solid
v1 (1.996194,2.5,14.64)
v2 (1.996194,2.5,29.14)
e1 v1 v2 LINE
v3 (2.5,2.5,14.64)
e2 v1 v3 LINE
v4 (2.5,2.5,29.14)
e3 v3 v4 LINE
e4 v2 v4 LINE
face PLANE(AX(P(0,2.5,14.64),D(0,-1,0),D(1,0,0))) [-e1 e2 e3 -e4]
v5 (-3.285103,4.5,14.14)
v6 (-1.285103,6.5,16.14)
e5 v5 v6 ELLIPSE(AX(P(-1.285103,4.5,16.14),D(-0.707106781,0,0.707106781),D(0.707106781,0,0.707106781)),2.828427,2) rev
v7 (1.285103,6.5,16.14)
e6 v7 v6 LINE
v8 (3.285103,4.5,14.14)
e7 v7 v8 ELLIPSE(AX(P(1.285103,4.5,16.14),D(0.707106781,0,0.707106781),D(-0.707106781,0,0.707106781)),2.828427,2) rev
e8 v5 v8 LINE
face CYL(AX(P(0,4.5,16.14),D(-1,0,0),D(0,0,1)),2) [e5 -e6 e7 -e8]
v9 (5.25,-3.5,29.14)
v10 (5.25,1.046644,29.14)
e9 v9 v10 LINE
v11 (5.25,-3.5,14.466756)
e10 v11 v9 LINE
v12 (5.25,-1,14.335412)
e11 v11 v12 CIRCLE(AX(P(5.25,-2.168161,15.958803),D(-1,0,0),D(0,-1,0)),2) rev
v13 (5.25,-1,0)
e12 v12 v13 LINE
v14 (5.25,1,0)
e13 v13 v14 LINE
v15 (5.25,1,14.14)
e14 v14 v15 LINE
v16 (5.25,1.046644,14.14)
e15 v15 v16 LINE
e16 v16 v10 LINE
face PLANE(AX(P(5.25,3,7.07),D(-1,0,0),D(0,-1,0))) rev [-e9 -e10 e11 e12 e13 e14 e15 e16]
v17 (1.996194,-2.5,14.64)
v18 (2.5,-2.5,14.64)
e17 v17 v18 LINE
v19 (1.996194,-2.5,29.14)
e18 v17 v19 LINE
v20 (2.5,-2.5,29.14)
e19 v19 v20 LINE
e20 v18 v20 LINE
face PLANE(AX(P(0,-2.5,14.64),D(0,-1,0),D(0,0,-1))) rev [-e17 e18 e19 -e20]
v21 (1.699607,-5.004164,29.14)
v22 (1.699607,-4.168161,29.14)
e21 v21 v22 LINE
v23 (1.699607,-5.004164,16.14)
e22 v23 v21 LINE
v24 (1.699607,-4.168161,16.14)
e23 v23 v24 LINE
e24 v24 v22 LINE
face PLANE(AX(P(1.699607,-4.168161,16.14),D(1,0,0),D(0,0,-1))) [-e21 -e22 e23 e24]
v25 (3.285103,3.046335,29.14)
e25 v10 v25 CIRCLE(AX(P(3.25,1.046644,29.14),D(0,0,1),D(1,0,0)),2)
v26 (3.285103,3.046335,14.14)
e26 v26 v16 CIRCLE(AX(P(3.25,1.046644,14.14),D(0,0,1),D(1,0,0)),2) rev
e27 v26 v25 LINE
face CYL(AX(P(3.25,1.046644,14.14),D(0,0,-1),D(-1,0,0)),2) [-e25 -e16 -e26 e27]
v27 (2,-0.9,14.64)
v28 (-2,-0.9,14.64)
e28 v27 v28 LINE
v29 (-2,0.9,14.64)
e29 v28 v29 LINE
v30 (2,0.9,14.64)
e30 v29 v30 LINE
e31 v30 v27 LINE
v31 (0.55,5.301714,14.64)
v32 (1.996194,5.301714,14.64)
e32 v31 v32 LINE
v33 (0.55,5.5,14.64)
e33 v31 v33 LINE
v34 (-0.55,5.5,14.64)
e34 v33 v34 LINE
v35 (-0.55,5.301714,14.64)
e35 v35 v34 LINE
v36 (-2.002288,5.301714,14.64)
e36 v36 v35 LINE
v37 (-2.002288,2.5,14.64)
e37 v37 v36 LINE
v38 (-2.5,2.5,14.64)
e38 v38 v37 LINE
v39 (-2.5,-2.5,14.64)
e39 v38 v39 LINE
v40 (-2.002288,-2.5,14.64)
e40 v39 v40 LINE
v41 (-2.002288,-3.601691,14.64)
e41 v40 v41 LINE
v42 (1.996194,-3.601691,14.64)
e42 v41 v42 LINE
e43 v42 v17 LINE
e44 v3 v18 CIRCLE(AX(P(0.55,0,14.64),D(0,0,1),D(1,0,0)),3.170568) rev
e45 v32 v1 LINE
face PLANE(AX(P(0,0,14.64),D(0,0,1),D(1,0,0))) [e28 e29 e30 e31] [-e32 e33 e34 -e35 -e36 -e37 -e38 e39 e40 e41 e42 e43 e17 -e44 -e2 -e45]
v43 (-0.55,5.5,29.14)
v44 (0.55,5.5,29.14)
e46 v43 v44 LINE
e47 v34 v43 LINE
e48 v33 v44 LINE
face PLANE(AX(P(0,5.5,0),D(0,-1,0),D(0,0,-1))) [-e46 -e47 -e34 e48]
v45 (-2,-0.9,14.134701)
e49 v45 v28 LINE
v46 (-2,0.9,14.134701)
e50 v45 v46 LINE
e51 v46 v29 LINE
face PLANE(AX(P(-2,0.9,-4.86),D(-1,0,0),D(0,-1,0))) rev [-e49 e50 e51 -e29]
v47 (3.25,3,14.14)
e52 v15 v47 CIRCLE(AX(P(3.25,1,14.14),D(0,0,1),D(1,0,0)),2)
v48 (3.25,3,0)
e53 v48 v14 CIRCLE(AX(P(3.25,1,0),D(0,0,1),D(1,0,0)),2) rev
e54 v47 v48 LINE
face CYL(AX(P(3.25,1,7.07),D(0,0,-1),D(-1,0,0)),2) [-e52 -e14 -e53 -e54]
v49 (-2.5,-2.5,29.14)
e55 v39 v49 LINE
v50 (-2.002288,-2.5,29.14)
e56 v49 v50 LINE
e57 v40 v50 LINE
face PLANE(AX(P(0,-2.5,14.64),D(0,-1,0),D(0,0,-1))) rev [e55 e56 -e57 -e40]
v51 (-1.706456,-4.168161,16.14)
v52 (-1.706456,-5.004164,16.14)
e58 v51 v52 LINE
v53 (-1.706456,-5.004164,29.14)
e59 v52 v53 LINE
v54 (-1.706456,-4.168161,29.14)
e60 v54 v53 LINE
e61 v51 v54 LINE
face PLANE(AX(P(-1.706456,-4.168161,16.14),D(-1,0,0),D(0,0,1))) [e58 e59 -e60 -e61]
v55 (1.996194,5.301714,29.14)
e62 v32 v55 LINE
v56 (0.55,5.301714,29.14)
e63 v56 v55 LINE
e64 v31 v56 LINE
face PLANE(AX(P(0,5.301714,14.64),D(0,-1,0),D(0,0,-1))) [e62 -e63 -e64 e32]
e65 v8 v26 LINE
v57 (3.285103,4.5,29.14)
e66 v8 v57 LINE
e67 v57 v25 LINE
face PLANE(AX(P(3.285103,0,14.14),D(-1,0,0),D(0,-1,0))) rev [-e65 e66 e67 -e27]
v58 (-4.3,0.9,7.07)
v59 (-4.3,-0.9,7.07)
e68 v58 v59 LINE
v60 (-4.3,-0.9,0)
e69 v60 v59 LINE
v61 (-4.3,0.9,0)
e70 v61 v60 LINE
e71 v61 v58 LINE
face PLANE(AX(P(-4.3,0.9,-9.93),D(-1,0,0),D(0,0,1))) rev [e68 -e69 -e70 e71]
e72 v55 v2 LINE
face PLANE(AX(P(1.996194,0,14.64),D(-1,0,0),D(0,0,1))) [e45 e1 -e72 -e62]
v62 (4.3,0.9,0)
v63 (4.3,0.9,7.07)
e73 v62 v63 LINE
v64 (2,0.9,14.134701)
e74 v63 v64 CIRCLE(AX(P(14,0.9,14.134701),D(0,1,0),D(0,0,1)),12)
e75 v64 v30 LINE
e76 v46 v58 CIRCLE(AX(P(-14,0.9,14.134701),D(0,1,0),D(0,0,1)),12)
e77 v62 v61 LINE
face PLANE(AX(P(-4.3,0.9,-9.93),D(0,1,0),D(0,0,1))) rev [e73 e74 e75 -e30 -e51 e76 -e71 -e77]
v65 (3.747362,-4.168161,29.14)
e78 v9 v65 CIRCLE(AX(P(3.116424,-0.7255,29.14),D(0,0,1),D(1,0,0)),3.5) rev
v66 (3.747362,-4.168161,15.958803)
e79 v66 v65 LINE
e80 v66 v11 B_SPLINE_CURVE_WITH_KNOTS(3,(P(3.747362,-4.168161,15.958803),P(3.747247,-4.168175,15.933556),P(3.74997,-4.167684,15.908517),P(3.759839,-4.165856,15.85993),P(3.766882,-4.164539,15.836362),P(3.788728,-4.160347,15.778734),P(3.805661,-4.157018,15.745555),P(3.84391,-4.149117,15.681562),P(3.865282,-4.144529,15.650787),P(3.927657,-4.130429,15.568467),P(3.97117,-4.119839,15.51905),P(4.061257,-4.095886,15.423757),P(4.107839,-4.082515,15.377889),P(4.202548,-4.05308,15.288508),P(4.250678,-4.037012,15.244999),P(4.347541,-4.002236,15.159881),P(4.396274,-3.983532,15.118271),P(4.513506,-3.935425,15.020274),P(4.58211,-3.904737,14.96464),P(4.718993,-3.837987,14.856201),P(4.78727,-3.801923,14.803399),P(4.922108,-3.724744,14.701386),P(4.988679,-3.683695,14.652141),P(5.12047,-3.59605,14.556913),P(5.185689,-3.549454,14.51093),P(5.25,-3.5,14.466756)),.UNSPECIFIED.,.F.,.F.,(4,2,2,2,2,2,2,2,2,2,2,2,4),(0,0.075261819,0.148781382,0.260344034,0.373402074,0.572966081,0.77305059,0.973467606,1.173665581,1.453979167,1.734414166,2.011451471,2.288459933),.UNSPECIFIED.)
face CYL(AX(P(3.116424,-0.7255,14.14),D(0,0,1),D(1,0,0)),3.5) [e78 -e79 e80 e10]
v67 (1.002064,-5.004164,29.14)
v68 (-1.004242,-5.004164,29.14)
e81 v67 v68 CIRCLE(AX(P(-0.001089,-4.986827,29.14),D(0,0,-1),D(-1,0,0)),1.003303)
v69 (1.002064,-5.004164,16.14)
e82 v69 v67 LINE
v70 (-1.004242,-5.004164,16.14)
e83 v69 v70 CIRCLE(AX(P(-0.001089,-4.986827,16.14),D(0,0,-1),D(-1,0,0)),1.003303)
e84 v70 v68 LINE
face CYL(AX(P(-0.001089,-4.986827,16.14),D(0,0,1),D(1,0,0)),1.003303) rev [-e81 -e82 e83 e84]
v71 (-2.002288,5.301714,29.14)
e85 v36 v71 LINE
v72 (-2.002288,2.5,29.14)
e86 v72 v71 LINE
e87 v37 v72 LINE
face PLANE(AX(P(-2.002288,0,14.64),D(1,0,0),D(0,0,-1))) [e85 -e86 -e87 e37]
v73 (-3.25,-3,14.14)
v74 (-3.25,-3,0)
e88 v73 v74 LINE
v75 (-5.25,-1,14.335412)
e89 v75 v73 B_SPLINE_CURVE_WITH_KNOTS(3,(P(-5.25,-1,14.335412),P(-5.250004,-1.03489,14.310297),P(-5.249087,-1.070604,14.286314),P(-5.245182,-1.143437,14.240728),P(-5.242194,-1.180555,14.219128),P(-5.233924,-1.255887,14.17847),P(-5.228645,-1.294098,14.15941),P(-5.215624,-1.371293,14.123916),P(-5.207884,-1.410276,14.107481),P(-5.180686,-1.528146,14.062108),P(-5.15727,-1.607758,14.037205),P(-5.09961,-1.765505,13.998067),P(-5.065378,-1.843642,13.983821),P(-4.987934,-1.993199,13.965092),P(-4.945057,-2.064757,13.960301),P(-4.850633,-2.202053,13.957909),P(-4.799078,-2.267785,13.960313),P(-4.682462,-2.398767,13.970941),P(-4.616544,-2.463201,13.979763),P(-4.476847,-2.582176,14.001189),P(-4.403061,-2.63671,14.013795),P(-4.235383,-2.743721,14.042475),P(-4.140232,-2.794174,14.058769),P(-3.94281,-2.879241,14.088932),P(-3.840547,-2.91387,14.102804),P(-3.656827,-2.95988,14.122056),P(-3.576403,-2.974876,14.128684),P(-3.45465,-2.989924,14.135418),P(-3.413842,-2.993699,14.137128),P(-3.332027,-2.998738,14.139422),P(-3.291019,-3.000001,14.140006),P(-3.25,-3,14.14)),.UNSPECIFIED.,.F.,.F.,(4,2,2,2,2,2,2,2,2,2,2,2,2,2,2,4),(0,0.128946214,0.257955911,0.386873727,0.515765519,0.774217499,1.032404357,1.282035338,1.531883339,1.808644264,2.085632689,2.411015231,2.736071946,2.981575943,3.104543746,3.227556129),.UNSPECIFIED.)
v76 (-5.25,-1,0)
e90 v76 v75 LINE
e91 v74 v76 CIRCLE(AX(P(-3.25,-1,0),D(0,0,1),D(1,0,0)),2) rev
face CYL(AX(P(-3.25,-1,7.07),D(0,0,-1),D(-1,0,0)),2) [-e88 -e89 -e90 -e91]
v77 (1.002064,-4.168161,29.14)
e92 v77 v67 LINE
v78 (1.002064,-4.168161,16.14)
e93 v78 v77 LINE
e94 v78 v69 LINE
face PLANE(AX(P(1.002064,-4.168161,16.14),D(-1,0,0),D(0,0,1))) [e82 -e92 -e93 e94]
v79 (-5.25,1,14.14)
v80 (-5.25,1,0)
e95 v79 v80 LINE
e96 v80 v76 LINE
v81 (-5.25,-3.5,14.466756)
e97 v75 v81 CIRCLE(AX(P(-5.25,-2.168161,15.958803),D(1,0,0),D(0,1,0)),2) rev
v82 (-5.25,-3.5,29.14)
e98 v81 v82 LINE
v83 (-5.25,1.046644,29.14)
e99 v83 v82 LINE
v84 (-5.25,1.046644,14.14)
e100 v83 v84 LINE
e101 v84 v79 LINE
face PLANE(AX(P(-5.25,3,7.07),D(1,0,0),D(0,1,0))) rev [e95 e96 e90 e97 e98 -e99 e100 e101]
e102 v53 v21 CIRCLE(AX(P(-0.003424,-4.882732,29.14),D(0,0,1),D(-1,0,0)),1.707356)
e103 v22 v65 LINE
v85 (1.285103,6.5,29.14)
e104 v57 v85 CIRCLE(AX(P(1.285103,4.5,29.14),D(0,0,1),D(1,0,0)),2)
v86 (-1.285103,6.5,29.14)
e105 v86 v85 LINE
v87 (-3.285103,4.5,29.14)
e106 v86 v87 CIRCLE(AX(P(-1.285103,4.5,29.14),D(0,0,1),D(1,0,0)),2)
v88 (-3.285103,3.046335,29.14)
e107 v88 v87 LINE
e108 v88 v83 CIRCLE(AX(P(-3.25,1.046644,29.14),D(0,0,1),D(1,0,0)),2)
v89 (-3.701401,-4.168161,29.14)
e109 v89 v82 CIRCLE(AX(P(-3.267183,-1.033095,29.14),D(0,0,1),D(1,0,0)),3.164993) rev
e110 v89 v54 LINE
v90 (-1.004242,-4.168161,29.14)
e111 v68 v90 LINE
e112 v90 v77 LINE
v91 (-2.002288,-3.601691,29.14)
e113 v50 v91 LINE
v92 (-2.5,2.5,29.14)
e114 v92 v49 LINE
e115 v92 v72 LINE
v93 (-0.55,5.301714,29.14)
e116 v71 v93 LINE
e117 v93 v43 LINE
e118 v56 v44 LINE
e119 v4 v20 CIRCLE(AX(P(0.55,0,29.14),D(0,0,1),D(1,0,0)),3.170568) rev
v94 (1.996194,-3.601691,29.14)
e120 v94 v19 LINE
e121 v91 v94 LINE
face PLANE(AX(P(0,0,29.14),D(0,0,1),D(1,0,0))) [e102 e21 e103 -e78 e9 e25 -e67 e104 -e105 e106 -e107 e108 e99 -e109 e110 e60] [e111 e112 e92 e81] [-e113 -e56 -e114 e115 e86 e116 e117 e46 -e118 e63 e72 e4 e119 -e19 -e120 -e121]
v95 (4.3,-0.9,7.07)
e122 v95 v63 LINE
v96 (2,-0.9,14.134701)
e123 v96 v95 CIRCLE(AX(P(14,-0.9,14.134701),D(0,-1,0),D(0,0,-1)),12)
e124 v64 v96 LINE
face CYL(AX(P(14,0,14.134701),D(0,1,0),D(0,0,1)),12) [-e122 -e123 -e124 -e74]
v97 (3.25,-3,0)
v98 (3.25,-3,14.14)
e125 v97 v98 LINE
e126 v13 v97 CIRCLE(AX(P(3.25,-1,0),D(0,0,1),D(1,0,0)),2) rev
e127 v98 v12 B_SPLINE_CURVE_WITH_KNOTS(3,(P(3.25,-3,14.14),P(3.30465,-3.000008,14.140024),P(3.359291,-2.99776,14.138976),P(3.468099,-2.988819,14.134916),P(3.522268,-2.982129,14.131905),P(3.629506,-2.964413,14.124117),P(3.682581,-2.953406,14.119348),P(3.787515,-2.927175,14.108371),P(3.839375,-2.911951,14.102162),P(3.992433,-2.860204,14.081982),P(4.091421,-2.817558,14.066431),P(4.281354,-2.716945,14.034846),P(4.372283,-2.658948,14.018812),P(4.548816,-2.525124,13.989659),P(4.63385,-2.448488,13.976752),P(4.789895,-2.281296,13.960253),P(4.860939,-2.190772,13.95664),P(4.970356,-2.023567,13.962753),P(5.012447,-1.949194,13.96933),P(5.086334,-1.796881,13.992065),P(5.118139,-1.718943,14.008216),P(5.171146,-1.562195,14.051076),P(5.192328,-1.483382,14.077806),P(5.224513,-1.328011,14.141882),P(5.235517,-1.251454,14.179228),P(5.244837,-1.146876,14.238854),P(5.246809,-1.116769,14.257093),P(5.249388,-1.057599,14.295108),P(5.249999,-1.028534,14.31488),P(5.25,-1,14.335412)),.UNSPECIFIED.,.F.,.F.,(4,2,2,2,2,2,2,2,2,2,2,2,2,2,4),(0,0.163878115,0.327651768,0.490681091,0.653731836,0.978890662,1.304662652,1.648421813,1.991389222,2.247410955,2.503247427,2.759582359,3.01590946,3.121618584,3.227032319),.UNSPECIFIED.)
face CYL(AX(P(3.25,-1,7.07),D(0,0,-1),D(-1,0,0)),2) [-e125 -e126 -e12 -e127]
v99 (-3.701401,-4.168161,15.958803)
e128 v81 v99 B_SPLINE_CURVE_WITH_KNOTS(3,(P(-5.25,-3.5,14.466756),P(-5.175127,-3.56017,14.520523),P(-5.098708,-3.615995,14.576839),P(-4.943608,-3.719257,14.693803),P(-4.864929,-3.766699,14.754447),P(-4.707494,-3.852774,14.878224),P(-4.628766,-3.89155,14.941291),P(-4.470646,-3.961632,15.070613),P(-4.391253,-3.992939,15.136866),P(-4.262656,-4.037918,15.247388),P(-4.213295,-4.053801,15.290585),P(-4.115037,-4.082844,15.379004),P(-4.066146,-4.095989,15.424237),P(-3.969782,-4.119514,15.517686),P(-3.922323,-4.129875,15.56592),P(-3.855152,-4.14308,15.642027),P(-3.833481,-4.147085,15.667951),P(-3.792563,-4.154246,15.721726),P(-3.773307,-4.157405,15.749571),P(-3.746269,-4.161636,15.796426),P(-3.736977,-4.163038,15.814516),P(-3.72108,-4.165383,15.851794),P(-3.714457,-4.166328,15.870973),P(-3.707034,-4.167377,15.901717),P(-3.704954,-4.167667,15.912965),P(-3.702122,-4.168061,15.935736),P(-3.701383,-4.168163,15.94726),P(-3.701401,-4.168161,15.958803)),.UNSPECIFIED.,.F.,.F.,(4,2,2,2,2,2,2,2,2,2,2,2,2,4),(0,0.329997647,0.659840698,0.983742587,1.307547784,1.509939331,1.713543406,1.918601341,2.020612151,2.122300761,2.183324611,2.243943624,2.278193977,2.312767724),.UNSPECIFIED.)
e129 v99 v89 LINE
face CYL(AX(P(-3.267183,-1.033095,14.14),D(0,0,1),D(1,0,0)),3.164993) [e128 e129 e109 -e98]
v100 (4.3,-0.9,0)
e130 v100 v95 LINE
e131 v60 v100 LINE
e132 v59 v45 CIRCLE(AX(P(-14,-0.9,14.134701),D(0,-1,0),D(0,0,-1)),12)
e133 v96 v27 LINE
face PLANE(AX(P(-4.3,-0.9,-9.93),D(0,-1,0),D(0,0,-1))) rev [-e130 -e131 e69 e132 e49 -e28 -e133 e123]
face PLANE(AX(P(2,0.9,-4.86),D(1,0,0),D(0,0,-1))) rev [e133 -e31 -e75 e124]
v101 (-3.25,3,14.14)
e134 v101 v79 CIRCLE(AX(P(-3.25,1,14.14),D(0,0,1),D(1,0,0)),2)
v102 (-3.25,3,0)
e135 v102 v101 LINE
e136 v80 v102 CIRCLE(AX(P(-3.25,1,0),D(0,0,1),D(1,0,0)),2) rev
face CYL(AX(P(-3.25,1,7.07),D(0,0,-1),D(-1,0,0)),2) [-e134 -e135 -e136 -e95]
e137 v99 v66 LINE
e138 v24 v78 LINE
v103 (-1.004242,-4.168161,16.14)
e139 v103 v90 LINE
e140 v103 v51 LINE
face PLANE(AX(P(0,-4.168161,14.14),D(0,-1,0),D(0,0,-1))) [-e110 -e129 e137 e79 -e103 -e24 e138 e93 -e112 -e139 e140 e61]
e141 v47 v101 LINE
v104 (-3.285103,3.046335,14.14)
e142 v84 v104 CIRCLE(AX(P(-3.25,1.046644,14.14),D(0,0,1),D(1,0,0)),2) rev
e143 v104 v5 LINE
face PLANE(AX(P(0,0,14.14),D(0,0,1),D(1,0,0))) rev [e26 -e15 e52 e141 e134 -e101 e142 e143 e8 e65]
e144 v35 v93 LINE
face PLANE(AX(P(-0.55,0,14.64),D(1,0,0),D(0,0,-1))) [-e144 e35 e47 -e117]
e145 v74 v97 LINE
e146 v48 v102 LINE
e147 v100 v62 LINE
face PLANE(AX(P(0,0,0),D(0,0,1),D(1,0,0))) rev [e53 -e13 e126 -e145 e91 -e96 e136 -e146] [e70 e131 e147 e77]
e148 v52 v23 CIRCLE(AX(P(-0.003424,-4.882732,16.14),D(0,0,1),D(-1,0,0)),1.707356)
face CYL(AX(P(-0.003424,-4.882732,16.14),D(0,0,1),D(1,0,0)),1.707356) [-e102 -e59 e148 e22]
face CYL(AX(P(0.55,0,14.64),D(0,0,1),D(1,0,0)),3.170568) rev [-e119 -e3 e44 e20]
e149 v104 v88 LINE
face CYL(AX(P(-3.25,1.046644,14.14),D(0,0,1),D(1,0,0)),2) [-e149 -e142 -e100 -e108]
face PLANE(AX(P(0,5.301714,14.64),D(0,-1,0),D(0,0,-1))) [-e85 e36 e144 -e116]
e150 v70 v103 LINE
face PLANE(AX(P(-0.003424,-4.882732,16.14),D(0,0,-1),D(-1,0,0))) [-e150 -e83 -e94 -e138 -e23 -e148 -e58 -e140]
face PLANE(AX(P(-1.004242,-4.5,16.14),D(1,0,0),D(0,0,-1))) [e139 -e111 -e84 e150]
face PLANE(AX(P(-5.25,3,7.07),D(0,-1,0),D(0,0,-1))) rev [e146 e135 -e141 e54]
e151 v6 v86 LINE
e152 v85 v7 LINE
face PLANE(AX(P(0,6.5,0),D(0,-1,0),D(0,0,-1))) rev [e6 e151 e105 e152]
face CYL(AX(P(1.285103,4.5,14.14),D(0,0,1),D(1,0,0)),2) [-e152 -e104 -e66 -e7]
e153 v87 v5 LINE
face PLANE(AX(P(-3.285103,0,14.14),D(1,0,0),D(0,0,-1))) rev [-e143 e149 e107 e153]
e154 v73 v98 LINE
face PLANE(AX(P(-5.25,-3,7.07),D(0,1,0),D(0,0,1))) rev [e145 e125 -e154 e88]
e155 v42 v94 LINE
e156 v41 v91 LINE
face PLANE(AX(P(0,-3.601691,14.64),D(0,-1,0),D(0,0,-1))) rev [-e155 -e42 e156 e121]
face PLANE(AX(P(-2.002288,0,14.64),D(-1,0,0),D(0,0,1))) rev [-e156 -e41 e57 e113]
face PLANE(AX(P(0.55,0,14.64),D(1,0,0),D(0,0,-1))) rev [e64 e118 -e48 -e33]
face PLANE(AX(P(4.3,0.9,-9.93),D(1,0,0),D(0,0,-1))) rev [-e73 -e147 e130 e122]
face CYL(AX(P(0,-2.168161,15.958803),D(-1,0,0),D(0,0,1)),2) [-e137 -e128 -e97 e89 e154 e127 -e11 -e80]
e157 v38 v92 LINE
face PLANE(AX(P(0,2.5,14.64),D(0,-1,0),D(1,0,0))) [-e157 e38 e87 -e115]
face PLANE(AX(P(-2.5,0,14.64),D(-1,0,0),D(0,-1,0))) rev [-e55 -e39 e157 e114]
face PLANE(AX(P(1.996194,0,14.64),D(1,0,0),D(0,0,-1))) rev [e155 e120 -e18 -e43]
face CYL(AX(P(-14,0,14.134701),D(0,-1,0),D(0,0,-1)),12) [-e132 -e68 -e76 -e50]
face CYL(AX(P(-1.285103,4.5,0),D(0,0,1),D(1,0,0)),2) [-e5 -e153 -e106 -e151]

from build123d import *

# Parameters (mm, degrees)
SKETCH1_W            = 10.5
SKETCH1_H            = 6
BOSS_EXTRUDE1_DEPTH  = 7.07
SKETCH3_W            = 8.6
SKETCH3_H            = 1.8
CUT_EXTRUDE2_DEPTH   = 17
SKETCH4_W            = 10.5
SKETCH4_H            = 6
BOSS_EXTRUDE2_DEPTH  = 7.07
SKETCH5_W            = 4
SKETCH5_H            = 1.8
CUT_EXTRUDE3_DEPTH   = 19
FILLET1_R            = 12
FILLET2_R            = 12
SKETCH19_W           = 10.5
SKETCH19_H           = 11
SKETCH19_W_2         = 4
SKETCH19_H_2         = 1.8
BOSS_EXTRUDE8_DEPTH  = 15
CUT_EXTRUDE8_DEPTH   = 14.5
SKETCH21_W           = 10.5
SKETCH21_H           = 15
BOSS_EXTRUDE9_DEPTH  = 1
CUT_EXTRUDE10_DEPTH  = 15
FILLET6_R            = 2
FILLET12_R           = 2
BOSS_EXTRUDE15_DEPTH = 13
FILLET15_R           = 2
FILLET16_R           = 2
FILLET17_R           = 2


with BuildPart() as part:
    # Sketch1 → Boss-Extrude1 (new body)
    with BuildSketch(Plane.XY):
        Rectangle(SKETCH1_W, SKETCH1_H)
    extrude(amount=BOSS_EXTRUDE1_DEPTH)

    # Sketch3 → Cut-Extrude2 (cut)
    with BuildSketch(Plane.XY.offset(7.07)):
        Rectangle(SKETCH3_W, SKETCH3_H)
    extrude(amount=-CUT_EXTRUDE2_DEPTH, mode=Mode.SUBTRACT)

    # Sketch4 → Boss-Extrude2 (add)
    with BuildSketch(Plane.XY.offset(7.07)):
        Rectangle(SKETCH4_W, SKETCH4_H)
    extrude(amount=BOSS_EXTRUDE2_DEPTH)

    # Sketch5 → Cut-Extrude3 (cut, symmetric)
    with BuildSketch(Plane.XY.offset(14.14)):
        Rectangle(SKETCH5_W, SKETCH5_H)
    extrude(amount=CUT_EXTRUDE3_DEPTH, both=True, mode=Mode.SUBTRACT)

    # Fillet1
    # the kernel refuses this fillet: 12 mm, written as the material it takes off along each edge
    with BuildSketch(Plane(origin=(2, -0.9, 7.07), x_dir=(1, 0, 0), z_dir=(0, 1, 0))) as fillet1_piece_1:
        with BuildLine():
            CenterArc((12, -7.064700984), FILLET1_R, 143.93341174, 36.06658826)
            Line((0, -7.064700984), (0, 0))
            Line((0, 0), (2.3, 0))
        make_face()
    extrude(amount=1.8, mode=Mode.SUBTRACT)

    # Fillet2
    # the kernel refuses this fillet: 12 mm, written as the material it takes off along each edge
    with BuildSketch(Plane(origin=(-2, 0.9, 7.07), x_dir=(0, 0, 1), z_dir=(0, -1, 0))) as fillet2_piece_1:
        with BuildLine():
            CenterArc((7.064700984, 12), FILLET2_R, 233.93341174, 36.06658826)
            Line((0, 2.3), (0, 0))
            Line((0, 0), (7.064700984, 0))
        make_face()
    extrude(amount=1.8, mode=Mode.SUBTRACT)

    # Sketch19 → Boss-Extrude8 (add)
    with BuildSketch(Plane.XY.offset(14.14)):
        Rectangle(SKETCH19_W, SKETCH19_H)
        Rectangle(SKETCH19_W_2, SKETCH19_H_2, mode=Mode.SUBTRACT)
    extrude(amount=BOSS_EXTRUDE8_DEPTH)

    # Sketch20 → Cut-Extrude8 (cut)
    with BuildSketch(Plane.XY.offset(29.14)):
        with BuildLine():
            Line((1.996194266, 2.5), (1.996194266, 3.60169129))
            Line((1.996194266, 3.60169129), (1.996194266, 5.301713665))
            Line((1.996194266, 5.301713665), (0.55, 5.301713665))
            Line((0.55, 5.301713665), (0.55, 5.5))
            Line((0.55, 5.5), (-0.55, 5.5))
            Line((-0.55, 5.5), (-0.55, 5.301713665))
            Line((-0.55, 5.301713665), (-2.002287503, 5.301713665))
            Line((-2.002287503, 5.301713665), (-2.002287503, 2.5))
            Line((-2.002287503, 2.5), (-2.5, 2.5))
            Line((-2.5, 2.5), (-2.5, -2.5))
            Line((-2.5, -2.5), (-2.002287503, -2.5))
            Line((-2.002287503, -2.5), (-2.002287503, -3.60169129))
            Line((-2.002287503, -3.60169129), (0, -3.60169129))
            Line((0, -3.60169129), (1.996194266, -3.60169129))
            Line((1.996194266, -3.60169129), (1.996194266, -2.5))
            Line((1.996194266, -2.5), (2.5, -2.5))
            ThreePointArc((2.5, -2.5), (3.720567772, 0), (2.5, 2.5))
            Line((2.5, 2.5), (1.996194266, 2.5))
        make_face()
    extrude(amount=-CUT_EXTRUDE8_DEPTH, mode=Mode.SUBTRACT)

    # Sketch21 → Boss-Extrude9 (add)
    with BuildSketch(Plane(origin=(0, 5.5, 0), x_dir=(1, 0, 0), z_dir=(0, 1, 0))):
        with Locations((0, -21.64)):
            Rectangle(SKETCH21_W, SKETCH21_H)
    extrude(amount=BOSS_EXTRUDE9_DEPTH)

    # Sketch22 → Cut-Extrude10 (cut)
    with BuildSketch(Plane.XY.offset(29.14)):
        Polygon((3.285102714, 3.046335485), (5.25, 3.046335485), (5.25, 5.593635507), (5.25, 6.5), (3.747361829, 6.5), (3.285102714, 6.5), (3.285102714, 3.836641371), align=None)
        Polygon((-5.25, 5.593635507), (-5.25, 3.046335485), (-4.265605325, 3.046335485), (-3.285102714, 3.046335485), (-3.285102714, 4.03485795), (-3.285102714, 5.593635507), (-3.285102714, 6.5), (-5.25, 6.5), align=None)
        with BuildLine():
            Line((-5.25, -3.5), (-5.25, -5.5))
            Line((-5.25, -5.5), (5.25, -5.5))
            Line((5.25, -5.5), (5.25, -3.5))
            ThreePointArc((5.25, -3.5), (4.53848024, -3.923585886), (3.747361829, -4.16816109))
            Line((3.747361829, -4.16816109), (-3.701400921, -4.16816109))
            ThreePointArc((-3.701400921, -4.16816109), (-4.521026788, -3.939133518), (-5.25, -3.5))
        make_face()
    extrude(amount=-CUT_EXTRUDE10_DEPTH, mode=Mode.SUBTRACT)

    # Fillet6
    # the kernel refuses this fillet: 2 mm, written as the material it takes off along each edge
    with BuildSketch(Plane(origin=(8.294369106, -4.16816109, 14.14), x_dir=(0, 1, 0), z_dir=(-1, 0, 0))) as fillet6_piece_1:
        with BuildLine():
            CenterArc((2, -1.818802911), FILLET6_R, 114.577232298, 65.422767702)
            Line((0, -1.818802911), (-0.04, -1.818802911))
            Line((-0.04, -1.818802911), (-0.04, 0))
            Line((-0.04, 0), (0, 0.04))
            ThreePointArc((0, 0.04), (0.584080545, 0.04), (1.151524312, 0.036376058))
            Line((1.151524312, 0.036376058), (1.16816109, 0))
        make_face()
    extrude(amount=16.542777304, mode=Mode.SUBTRACT)

    # Fillet12
    fillet12_edges = [part.edges().sort_by_distance(p)[0] for p in [
        (5.25, -3, 7.07),
        (-5.25, -3, 7.07),
        (-5.25, 3, 7.07),
        (5.25, 3, 7.07),
    ]]
    fillet(fillet12_edges, radius=FILLET12_R)

    # Sketch24 → Boss-Extrude15 (add)
    with BuildSketch(Plane.XY.offset(29.14)):
        with BuildLine():
            Line((-1.004242215, -4.5), (-1.004242215, -5.004164362))
            ThreePointArc((-1.004242215, -5.004164362), (-0.001088997, -5.990129828), (1.002064221, -5.004164362))
            Line((1.002064221, -5.004164362), (1.002064221, -4.16816109))
            Line((1.002064221, -4.16816109), (1.699607491, -4.16816109))
            Line((1.699607491, -4.16816109), (1.699607491, -5.004164362))
            ThreePointArc((1.699607491, -5.004164362), (-0.003424292, -6.590087757), (-1.706456074, -5.004164362))
            Line((-1.706456074, -5.004164362), (-1.706456074, -4.16816109))
            Line((-1.706456074, -4.16816109), (-1.004242215, -4.16816109))
            Line((-1.004242215, -4.16816109), (-1.004242215, -4.5))
        make_face()
    extrude(amount=-BOSS_EXTRUDE15_DEPTH)

    # Fillet15
    fillet15_edges = [part.edges().sort_by_distance(p)[0] for p in [
        (0, 6.5, 14.14),
        (-3.285102714, 6.5, 21.64),
        (3.285102714, 6.5, 21.64),
    ]]
    fillet(fillet15_edges, radius=FILLET15_R)

    # Fillet16
    # the kernel refuses this fillet: 2 mm, written as the material it takes off along each edge
    with BuildSketch(Plane(origin=(5.25, 3.046335485, 34.14), x_dir=(-1, 0, 0), z_dir=(0, 0, -1))) as fillet16_piece_1_section:
        with BuildLine():
            CenterArc((FILLET16_R, -FILLET16_R), FILLET16_R, 90, 90)
            Line((0, -FILLET16_R), (0, 0))
            Line((0, 0), (FILLET16_R, 0))
        make_face()
    fillet16_piece_1 = extrude(amount=25, mode=Mode.PRIVATE)
    fillet16_piece_1 = split(fillet16_piece_1, bisect_by=Plane(origin=(3.285102714, 3.046335485, 34.14), z_dir=(1, 0, 0)), keep=Keep.TOP, mode=Mode.PRIVATE)
    add(fillet16_piece_1, mode=Mode.SUBTRACT)

    # Fillet17
    # the kernel refuses this fillet: 2 mm, written as the material it takes off along each edge
    with BuildSketch(Plane(origin=(-5.25, 3.046335485, 34.14), x_dir=(1, 0, 0), z_dir=(0, 0, -1))) as fillet17_piece_1_section:
        with BuildLine():
            CenterArc((FILLET17_R, FILLET17_R), FILLET17_R, 180, 90)
            Line((0, FILLET17_R), (0, 0))
            Line((0, 0), (FILLET17_R, 0))
        make_face()
    fillet17_piece_1 = extrude(amount=25, mode=Mode.PRIVATE)
    fillet17_piece_1 = split(fillet17_piece_1, bisect_by=Plane(origin=(-3.285102714, 3.046335485, 34.14), z_dir=(-1, 0, 0)), keep=Keep.TOP, mode=Mode.PRIVATE)
    add(fillet17_piece_1, mode=Mode.SUBTRACT)


solid = part.part
